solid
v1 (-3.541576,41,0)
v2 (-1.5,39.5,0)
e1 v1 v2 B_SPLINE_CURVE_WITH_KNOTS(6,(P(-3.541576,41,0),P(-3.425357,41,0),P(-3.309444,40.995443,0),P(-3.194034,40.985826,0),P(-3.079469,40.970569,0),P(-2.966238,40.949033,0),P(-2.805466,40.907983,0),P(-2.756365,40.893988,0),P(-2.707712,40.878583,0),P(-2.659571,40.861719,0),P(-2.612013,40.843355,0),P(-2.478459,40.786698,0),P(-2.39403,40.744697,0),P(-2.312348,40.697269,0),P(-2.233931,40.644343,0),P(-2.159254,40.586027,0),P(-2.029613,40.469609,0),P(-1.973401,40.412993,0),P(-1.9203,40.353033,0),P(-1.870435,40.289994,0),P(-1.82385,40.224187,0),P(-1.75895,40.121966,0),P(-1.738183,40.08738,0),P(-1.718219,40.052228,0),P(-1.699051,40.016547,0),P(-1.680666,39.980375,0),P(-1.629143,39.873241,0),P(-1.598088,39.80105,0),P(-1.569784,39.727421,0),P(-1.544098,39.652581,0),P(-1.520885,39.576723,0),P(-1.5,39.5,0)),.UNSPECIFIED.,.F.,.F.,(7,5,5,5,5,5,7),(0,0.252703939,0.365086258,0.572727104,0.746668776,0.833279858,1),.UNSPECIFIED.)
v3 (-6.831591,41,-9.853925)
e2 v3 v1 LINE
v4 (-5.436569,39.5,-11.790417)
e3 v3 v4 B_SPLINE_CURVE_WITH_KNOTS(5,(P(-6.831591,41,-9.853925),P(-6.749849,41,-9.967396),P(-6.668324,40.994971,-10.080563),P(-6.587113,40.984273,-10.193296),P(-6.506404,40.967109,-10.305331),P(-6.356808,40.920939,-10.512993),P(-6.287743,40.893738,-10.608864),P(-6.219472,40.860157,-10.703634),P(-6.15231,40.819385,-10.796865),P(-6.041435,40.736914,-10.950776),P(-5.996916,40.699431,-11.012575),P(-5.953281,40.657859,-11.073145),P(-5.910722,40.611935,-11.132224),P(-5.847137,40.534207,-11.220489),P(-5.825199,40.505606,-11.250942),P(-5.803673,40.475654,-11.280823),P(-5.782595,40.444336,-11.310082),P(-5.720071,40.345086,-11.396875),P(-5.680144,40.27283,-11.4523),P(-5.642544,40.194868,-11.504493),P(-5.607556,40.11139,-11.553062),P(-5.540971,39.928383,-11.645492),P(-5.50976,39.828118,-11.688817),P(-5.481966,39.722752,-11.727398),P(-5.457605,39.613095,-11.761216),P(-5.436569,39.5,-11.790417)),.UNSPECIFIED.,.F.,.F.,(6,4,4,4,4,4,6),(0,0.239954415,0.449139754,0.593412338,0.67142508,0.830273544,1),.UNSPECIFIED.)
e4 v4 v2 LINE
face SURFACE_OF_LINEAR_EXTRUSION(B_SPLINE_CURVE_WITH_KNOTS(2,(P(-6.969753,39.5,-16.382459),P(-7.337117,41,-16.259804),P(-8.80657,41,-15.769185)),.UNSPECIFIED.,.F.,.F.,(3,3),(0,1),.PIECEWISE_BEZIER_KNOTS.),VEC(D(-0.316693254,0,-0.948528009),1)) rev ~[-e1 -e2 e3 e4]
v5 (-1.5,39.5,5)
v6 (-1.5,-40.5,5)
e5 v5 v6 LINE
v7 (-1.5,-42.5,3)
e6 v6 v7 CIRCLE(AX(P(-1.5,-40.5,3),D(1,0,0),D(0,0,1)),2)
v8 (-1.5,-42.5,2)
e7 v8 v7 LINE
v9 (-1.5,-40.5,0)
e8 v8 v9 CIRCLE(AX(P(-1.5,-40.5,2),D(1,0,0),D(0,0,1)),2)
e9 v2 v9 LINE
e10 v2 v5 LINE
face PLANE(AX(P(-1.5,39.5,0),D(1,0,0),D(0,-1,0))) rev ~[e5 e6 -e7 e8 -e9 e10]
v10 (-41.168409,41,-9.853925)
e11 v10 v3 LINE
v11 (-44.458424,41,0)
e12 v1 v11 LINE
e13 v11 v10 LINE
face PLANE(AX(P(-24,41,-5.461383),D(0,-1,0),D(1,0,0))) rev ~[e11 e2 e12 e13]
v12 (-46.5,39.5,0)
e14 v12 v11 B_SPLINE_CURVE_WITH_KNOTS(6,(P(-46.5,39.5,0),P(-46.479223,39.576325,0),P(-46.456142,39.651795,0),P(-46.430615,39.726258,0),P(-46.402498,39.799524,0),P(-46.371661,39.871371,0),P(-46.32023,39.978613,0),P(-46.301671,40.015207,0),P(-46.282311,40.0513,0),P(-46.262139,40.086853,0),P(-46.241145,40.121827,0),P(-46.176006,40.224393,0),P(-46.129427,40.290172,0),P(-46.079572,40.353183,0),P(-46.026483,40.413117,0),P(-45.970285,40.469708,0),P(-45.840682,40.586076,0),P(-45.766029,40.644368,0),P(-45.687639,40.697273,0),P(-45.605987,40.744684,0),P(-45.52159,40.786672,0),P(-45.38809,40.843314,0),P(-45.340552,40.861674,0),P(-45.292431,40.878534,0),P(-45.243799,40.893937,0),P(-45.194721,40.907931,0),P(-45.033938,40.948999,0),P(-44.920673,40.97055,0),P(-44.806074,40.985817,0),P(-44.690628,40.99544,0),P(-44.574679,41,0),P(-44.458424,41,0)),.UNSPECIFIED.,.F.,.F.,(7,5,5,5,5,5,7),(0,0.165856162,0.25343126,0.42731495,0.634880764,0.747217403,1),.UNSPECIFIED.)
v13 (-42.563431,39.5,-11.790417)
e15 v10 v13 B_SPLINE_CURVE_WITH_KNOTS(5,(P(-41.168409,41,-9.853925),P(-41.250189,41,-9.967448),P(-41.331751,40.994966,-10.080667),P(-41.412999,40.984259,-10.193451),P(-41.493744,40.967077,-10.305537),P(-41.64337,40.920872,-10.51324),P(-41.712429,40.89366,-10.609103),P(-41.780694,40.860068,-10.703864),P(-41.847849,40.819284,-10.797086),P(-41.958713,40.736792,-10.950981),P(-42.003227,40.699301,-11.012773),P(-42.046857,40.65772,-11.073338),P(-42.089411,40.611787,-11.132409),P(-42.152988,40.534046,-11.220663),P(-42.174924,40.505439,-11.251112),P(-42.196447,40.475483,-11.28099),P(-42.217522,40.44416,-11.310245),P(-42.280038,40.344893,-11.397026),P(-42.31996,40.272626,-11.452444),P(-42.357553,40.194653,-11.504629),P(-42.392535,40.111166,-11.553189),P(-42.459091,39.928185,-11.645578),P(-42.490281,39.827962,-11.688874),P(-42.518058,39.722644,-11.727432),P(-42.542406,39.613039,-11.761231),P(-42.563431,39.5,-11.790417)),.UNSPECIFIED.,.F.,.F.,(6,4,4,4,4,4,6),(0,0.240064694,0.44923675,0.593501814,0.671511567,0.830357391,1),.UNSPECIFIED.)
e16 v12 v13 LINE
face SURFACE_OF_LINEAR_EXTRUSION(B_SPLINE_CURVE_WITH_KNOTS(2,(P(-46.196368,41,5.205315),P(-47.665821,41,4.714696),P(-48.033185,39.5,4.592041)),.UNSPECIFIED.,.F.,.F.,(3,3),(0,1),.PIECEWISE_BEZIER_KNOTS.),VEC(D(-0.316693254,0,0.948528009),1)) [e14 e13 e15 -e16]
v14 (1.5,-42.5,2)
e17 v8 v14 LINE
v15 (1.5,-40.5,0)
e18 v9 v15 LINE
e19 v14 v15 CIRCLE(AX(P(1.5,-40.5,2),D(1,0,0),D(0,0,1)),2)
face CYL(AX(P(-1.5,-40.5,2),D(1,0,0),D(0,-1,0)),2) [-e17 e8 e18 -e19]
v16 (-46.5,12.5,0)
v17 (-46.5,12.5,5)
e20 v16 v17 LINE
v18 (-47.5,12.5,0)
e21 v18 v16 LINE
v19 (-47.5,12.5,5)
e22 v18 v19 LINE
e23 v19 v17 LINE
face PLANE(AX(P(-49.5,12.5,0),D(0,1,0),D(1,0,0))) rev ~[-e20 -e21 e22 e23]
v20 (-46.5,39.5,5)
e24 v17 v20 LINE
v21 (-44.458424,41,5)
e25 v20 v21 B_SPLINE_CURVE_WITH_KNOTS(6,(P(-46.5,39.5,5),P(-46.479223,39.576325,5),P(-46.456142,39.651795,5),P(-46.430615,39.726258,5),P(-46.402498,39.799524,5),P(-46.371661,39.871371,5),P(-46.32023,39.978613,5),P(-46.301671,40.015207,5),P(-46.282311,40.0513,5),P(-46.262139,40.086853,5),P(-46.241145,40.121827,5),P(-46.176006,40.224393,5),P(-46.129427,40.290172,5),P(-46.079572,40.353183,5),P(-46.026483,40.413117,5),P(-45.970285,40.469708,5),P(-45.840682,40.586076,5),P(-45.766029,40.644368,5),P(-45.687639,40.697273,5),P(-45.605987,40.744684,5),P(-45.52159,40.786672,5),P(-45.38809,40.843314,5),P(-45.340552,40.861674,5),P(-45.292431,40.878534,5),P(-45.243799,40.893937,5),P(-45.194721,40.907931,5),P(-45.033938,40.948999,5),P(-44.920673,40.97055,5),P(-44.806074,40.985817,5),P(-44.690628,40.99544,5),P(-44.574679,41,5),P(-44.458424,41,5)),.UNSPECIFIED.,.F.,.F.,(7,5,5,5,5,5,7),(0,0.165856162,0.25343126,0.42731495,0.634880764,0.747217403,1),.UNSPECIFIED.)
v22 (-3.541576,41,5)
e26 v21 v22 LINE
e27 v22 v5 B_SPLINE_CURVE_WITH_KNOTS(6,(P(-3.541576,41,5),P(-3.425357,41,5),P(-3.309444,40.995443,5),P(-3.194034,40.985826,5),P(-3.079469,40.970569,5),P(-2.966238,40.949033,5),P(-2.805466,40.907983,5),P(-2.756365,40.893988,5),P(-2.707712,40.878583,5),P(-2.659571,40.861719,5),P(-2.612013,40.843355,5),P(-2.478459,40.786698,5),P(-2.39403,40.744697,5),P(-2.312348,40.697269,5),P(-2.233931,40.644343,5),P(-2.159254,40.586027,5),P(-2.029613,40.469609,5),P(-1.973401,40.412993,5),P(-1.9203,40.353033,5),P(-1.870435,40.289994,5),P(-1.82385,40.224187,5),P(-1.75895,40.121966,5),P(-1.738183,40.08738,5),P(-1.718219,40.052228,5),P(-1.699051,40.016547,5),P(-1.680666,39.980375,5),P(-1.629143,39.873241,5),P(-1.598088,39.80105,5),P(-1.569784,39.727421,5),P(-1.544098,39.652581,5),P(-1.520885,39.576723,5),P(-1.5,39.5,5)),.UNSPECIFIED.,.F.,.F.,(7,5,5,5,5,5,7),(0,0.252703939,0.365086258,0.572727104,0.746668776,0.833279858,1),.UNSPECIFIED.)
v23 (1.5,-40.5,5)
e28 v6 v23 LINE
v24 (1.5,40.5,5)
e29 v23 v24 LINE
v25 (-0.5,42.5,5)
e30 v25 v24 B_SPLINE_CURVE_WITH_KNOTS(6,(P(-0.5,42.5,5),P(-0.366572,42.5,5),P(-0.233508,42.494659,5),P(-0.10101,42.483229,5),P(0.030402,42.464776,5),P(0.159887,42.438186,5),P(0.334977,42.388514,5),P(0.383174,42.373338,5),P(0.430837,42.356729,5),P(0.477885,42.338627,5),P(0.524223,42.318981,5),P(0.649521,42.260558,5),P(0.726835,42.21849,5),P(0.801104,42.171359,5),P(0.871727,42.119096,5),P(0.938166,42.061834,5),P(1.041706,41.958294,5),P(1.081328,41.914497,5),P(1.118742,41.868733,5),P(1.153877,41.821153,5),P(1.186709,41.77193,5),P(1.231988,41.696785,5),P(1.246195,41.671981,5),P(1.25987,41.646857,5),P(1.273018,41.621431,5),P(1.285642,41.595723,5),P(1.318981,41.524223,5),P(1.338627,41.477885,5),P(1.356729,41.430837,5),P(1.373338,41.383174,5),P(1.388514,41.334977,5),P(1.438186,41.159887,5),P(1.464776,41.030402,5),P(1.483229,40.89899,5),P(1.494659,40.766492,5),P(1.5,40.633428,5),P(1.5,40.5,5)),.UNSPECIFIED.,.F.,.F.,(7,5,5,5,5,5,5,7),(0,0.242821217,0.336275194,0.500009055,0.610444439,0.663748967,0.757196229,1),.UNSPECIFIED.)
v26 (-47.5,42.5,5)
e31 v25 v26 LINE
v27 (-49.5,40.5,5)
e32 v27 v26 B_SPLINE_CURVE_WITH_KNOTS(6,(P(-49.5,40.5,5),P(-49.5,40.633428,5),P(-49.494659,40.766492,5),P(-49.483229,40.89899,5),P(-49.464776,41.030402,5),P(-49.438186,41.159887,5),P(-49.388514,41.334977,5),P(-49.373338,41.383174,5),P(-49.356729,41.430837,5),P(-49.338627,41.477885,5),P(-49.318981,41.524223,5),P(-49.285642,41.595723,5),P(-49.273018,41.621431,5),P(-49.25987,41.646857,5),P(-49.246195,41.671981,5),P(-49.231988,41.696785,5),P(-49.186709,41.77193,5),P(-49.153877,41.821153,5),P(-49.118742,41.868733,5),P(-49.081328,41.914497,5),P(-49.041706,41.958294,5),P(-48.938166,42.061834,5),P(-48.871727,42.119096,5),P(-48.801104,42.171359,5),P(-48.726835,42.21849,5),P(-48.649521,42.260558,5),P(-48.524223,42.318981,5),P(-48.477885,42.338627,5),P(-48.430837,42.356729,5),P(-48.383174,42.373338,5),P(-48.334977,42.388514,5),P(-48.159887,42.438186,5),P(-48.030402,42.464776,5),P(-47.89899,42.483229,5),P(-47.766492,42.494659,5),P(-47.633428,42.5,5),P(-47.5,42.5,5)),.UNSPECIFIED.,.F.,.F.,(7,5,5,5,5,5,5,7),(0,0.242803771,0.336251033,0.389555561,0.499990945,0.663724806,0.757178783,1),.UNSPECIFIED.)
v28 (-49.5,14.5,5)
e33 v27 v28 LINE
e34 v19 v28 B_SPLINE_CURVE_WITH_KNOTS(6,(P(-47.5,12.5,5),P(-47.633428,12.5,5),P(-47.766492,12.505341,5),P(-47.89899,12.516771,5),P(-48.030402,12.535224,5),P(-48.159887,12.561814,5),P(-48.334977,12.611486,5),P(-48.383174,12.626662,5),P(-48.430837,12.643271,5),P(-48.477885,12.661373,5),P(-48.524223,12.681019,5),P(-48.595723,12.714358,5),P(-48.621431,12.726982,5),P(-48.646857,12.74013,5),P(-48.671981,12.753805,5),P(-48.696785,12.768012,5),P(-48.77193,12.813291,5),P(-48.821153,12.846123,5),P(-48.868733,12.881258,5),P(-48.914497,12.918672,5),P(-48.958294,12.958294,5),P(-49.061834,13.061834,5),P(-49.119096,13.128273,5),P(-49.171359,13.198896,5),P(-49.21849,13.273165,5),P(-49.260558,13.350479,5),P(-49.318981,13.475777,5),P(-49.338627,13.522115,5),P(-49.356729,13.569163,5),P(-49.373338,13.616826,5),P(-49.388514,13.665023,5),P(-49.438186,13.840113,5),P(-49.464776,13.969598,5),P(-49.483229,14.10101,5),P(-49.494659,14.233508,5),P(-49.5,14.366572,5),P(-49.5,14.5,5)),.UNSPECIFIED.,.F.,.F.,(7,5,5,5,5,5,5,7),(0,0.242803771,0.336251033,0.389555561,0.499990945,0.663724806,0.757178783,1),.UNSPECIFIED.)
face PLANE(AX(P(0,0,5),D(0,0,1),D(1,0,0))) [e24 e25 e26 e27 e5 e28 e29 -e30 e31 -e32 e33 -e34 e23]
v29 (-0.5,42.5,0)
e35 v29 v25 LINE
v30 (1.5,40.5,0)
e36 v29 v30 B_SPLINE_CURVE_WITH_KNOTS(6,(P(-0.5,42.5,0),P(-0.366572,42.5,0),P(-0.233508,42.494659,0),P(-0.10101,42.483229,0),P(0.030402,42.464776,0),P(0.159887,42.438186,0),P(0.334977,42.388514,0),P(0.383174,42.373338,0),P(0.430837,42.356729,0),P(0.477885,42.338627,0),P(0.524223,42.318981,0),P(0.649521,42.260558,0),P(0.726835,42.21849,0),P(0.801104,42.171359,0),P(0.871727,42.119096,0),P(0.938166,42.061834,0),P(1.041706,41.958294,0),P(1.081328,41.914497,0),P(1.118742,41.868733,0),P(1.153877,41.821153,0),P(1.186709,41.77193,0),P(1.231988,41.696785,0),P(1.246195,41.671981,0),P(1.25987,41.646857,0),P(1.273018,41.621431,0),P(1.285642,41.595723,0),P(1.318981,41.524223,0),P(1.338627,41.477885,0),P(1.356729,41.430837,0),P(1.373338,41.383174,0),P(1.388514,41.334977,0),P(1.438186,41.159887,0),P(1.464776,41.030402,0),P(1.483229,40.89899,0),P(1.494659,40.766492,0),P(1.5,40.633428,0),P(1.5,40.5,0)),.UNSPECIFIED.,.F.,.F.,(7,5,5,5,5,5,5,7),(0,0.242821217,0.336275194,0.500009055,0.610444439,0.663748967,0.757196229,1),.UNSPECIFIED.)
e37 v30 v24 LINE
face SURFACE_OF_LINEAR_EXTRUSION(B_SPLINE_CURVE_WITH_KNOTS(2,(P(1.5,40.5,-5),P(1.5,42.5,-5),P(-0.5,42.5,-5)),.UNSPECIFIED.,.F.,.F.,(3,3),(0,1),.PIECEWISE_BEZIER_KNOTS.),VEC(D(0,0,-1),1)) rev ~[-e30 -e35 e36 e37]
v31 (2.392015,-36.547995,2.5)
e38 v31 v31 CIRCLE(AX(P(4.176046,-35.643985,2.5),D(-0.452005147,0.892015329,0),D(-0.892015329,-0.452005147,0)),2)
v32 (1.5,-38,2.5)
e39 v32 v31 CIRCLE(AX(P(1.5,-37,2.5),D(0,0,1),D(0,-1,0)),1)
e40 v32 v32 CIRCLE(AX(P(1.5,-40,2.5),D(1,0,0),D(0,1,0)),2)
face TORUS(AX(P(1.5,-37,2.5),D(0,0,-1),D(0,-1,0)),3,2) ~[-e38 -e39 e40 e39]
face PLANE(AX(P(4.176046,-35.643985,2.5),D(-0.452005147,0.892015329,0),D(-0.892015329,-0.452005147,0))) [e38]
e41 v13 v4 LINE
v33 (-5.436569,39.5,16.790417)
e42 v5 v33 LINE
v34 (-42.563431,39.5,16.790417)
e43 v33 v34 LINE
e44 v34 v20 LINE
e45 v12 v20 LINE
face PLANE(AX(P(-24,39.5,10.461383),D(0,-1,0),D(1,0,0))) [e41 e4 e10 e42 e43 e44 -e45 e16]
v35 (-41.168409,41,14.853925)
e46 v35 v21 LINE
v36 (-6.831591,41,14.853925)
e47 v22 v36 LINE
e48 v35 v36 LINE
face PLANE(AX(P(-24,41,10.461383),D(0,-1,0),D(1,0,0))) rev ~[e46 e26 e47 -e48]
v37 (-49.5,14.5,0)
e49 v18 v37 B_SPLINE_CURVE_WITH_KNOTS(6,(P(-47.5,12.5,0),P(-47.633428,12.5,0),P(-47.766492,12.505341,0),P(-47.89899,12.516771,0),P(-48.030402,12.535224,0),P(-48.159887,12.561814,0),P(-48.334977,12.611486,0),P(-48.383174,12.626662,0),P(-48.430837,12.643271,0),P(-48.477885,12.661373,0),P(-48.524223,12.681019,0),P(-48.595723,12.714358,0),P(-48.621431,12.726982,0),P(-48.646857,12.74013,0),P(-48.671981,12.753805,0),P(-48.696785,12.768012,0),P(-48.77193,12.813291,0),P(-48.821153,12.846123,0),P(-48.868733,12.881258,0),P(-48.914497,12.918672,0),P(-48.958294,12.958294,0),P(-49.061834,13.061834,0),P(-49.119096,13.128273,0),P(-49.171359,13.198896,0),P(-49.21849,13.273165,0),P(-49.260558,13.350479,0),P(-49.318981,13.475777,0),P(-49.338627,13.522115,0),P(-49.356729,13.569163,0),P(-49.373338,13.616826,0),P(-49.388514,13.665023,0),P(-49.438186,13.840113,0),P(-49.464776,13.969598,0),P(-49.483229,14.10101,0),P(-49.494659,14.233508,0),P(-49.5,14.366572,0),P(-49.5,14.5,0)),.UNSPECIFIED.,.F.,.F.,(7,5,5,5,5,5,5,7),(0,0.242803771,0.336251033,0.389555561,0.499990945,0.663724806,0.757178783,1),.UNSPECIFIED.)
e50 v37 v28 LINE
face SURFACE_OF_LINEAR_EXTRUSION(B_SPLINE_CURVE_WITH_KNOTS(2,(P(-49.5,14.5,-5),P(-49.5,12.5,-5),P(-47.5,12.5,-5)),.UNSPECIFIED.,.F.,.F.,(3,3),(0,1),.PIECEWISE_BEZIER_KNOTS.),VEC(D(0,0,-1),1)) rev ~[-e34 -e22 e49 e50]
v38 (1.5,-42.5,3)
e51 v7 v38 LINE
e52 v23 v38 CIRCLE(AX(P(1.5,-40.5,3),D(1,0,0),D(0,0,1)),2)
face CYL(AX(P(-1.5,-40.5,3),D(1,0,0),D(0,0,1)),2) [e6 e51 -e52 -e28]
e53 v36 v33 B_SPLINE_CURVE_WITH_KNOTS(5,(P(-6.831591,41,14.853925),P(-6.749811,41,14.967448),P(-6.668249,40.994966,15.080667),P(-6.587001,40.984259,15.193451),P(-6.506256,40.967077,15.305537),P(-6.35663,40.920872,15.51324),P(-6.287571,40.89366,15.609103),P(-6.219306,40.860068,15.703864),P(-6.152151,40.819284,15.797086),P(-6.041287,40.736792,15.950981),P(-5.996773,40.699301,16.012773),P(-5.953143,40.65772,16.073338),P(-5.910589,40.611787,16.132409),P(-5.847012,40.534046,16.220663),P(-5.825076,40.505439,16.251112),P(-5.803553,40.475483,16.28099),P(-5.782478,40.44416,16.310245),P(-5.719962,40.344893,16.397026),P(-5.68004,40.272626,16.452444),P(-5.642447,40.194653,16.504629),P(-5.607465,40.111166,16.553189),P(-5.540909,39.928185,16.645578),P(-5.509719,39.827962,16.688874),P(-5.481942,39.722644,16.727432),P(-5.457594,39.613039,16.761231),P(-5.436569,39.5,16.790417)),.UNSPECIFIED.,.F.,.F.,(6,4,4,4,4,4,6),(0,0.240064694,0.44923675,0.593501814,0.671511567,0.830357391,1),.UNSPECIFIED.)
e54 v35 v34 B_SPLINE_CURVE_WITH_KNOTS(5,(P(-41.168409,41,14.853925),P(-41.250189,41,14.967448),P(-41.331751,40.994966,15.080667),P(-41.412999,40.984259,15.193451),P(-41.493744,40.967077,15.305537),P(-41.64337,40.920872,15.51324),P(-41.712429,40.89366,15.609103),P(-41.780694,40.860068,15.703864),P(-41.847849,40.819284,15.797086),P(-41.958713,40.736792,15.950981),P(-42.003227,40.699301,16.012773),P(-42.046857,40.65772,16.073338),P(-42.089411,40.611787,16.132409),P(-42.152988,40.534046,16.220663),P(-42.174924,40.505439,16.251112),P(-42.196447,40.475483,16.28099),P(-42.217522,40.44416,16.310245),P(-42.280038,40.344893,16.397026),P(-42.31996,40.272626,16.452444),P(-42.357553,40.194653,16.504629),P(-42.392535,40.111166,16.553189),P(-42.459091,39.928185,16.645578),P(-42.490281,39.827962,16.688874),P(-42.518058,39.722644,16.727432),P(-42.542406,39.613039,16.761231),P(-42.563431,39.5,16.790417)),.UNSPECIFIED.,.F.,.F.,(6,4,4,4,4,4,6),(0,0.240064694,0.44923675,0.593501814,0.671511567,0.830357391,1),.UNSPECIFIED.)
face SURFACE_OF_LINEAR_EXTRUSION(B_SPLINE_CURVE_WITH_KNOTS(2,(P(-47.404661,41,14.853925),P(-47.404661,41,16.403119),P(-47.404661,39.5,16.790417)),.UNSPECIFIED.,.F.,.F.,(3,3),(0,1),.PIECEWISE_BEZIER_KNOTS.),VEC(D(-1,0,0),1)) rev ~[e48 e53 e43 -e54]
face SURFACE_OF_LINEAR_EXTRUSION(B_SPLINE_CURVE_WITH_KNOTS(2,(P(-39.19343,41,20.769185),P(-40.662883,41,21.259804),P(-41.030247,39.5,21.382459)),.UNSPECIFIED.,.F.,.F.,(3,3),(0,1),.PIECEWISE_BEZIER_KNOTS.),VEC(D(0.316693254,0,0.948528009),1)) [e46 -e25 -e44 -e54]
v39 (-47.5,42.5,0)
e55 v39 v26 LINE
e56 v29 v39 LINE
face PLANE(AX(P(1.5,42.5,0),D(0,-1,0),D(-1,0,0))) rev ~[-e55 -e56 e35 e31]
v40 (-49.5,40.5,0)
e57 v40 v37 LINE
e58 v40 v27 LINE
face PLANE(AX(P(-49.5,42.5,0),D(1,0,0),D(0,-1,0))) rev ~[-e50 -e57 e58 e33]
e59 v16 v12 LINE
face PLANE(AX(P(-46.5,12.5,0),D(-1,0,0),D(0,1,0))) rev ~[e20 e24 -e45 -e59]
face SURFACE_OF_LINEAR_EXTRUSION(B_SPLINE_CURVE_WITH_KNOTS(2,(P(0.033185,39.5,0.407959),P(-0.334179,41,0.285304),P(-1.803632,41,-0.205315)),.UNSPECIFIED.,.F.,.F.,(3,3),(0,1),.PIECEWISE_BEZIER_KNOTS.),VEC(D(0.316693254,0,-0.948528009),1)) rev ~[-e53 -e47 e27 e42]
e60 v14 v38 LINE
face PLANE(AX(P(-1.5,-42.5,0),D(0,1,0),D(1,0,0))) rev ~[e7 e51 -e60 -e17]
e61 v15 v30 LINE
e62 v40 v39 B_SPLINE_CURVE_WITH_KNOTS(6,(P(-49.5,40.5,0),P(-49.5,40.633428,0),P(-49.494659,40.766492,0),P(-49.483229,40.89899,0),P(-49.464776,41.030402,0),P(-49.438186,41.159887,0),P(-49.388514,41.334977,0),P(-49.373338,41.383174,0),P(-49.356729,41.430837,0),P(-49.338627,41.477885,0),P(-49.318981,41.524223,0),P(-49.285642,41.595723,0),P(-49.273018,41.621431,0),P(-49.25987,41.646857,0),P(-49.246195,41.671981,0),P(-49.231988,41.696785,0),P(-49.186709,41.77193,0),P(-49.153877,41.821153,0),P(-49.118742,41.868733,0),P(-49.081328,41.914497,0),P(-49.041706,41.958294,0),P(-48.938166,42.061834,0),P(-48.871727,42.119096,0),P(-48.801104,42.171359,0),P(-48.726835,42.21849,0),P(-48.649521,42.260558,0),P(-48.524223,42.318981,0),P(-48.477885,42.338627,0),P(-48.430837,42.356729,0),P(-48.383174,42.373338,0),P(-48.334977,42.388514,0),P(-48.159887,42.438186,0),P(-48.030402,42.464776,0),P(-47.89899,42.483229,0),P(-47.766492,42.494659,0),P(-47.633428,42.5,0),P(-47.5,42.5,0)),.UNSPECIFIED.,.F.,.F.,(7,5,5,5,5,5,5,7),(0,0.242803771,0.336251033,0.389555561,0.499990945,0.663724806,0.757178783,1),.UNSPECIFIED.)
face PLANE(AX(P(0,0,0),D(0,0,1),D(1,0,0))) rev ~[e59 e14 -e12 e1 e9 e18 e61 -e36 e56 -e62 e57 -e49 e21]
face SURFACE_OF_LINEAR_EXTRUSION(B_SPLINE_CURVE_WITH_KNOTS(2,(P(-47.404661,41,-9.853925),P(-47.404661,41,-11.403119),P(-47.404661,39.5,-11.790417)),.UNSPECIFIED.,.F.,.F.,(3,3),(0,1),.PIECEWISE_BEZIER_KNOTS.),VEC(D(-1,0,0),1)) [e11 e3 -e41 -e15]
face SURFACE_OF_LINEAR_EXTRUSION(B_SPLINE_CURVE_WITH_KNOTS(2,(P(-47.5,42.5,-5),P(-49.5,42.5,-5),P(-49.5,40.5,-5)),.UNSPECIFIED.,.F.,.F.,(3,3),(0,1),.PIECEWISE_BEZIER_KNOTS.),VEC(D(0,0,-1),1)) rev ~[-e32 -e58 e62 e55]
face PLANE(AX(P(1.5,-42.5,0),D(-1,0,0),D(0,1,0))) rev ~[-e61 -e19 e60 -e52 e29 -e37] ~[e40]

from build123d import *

# Parameters (mm, degrees)
F0_W         = 3
F0_H         = 27
F1_DEPTH     = 5
F3_DEPTH     = 1.5
F4_R         = 2
F5_ANGLE     = 116.8724050768
F6_R         = 2
F7_T1_DEPTH  = 15
F7_T3_DEPTH  = 46.8093211895
F7_T8_DEPTH  = 22.1126839652
F7_T13_DEPTH = 22.1126839652
F7_T18_DEPTH = 22.1126839652
F7_T23_DEPTH = 22.1126839652
F7_T28_DEPTH = 22.1126839652
F7_T33_DEPTH = 22.1126839652
F7_T38_DEPTH = 22.1126839652
F7_T43_DEPTH = 22.1126839652


# Not quite as in the source:
# - a fillet or chamfer that OpenCascade refuses, or shapes differently, is made with other operations: its cross-section is extruded or revolved along the edge and cut away or added


with BuildPart() as f1:
    # F0 (on Top) → F1 (new body)
    with BuildSketch(Plane.XY):
        Polygon((1.5, -42.5), (1.5, 42.5), (-1.5, 42.5), (-1.5, 39.5), (-1.5, -42.5), align=None)
        Polygon((-1.5, 39.5), (-1.5, 42.5), (-49.5, 42.5), (-49.5, 39.5), (-46.5, 39.5), align=None)
        with Locations((-48, 26)):
            Rectangle(F0_W, F0_H)
    extrude(amount=F1_DEPTH)

    # F2 (on face) → F3 (join)
    with BuildSketch(Plane.XZ.offset(-39.5)):
        Polygon((-42.563431412, 16.7904171348), (-46.5, 5), (-1.5, 5), (-5.436568588, 16.7904171348), (-24, 16.7904171348), align=None)
        Polygon((-1.5, 0), (-46.5, 0), (-42.563431412, -11.7904171348), (-24, -11.7904171348), (-5.436568588, -11.7904171348), align=None)
    extrude(amount=-F3_DEPTH)

    # F4 (on face) → F5 (revolve)
    with BuildSketch(Plane.YZ.offset(1.5)):
        with Locations((-40, 2.5)):
            Circle(F4_R)
    revolve(axis=Axis((1.5, -37, 2.371235867), (0, 0, 1)), revolution_arc=F5_ANGLE)

    # F6
    f6_edges = [f1.edges().sort_by_distance(p)[0] for p in [
        (0, -42.5, 0),
        (0, -42.5, 5),
    ]]
    fillet(f6_edges, radius=F6_R)

    # F7: fillet of radius 2 on 9 edges, made by hand

    # F7_s2 → F7_t1 (cut)
    with BuildSketch(Plane.XY.offset(-5)):
        with BuildLine():
            add(Edge.make_bspline(
                [(1.5, 40.5), (1.5, 42.5), (-0.5, 42.5)],
                knots=[0, 0, 0, 1, 1, 1], degree=2, weights=[1, 1, 1]))
            Line((-0.5, 42.5), (1.5, 42.5))
            Line((1.5, 42.5), (1.5, 40.5))
        make_face()
        with BuildLine():
            add(Edge.make_bspline(
                [(-47.5, 42.5), (-49.5, 42.5), (-49.5, 40.5)],
                knots=[0, 0, 0, 1, 1, 1], degree=2, weights=[1, 1, 1]))
            Line((-49.5, 40.5), (-49.5, 42.5))
            Line((-49.5, 42.5), (-47.5, 42.5))
        make_face()
        with BuildLine():
            add(Edge.make_bspline(
                [(-49.5, 14.5), (-49.5, 12.5), (-47.5, 12.5)],
                knots=[0, 0, 0, 1, 1, 1], degree=2, weights=[1, 1, 1]))
            Line((-47.5, 12.5), (-49.5, 12.5))
            Line((-49.5, 12.5), (-49.5, 14.5))
        make_face()
    extrude(amount=F7_T1_DEPTH, mode=Mode.SUBTRACT)

    # F7_s4 → F7_t3 (cut)
    with BuildSketch(Plane.YZ.offset(-47.4046605947)):
        with BuildLine():
            add(Edge.make_bspline(
                [(41, 14.8539254617), (41, 16.4031188001), (39.5, 16.7904171348)],
                knots=[0, 0, 0, 1, 1, 1], degree=2, weights=[1, 1, 1]))
            Line((39.5, 16.7904171348), (41, 16.7904171348))
            Line((41, 16.7904171348), (41, 14.8539254617))
        make_face()
        with BuildLine():
            add(Edge.make_bspline(
                [(41, -9.8539254617), (41, -11.4031188001), (39.5, -11.7904171348)],
                knots=[0, 0, 0, 1, 1, 1], degree=2, weights=[1, 1, 1]))
            Line((39.5, -11.7904171348), (41, -11.7904171348))
            Line((41, -11.7904171348), (41, -9.8539254617))
        make_face()
    extrude(amount=F7_T3_DEPTH, mode=Mode.SUBTRACT)


with BuildPart() as f7_tool6:
    # F7_s7 → F7_t8 (new body)
    with BuildSketch(Plane(origin=(2.3080156307, 0, 6.912737942), x_dir=(0, 1, 0), z_dir=(-0.3166932536, 0, -0.9485280086))):
        with BuildLine():
            add(Edge.make_bspline(
                [(41, -43.7535269955), (41, -45.302720334), (39.5, -45.6900186686)],
                knots=[0, 0, 0, 1, 1, 1], degree=2, weights=[1, 1, 1]))
            Line((39.5, -45.6900186686), (41, -45.6900186686))
            Line((41, -45.6900186686), (41, -43.7535269955))
        make_face()
    extrude(amount=F7_T8_DEPTH)

    split(bisect_by=Plane.XY.offset(5), keep=Keep.TOP)


with BuildPart() as f1_1:
    add(f1.part)

    # F7_t5: cut F7_tool6
    add(f7_tool6.part, mode=Mode.SUBTRACT)


with BuildPart() as f7_tool11:
    # F7_s12 → F7_t13 (new body)
    with BuildSketch(Plane(origin=(2.3080156307, 0, 6.912737942), x_dir=(0, 1, 0), z_dir=(-0.3166932536, 0, -0.9485280086))):
        with BuildLine():
            add(Edge.make_bspline(
                [(41, -43.7535269955), (41, -45.302720334), (39.5, -45.6900186686)],
                knots=[0, 0, 0, 1, 1, 1], degree=2, weights=[1, 1, 1]))
            Line((39.5, -45.6900186686), (41, -45.6900186686))
            Line((41, -45.6900186686), (41, -43.7535269955))
        make_face()
    extrude(amount=F7_T13_DEPTH)

    split(bisect_by=Plane.XY, keep=Keep.BOTTOM)


with BuildPart() as f1_2:
    add(f1_1.part)

    # F7_t10: cut F7_tool11
    add(f7_tool11.part, mode=Mode.SUBTRACT)


with BuildPart() as f7_tool16:
    # F7_s17 → F7_t18 (new body)
    with BuildSketch(Plane(origin=(-0.1192194099, 0, 0.3570740714), x_dir=(0, 1, 0), z_dir=(-0.3166932536, 0, 0.9485280086))):
        with BuildLine():
            add(Edge.make_bspline(
                [(39.5, -0.160674255), (41, 0.2266240796), (41, 1.7758174181)],
                knots=[0, 0, 0, 1, 1, 1], degree=2, weights=[1, 1, 1]))
            Line((41, 1.7758174181), (41, -0.160674255))
            Line((41, -0.160674255), (39.5, -0.160674255))
        make_face()
    extrude(amount=F7_T18_DEPTH)

    split(bisect_by=Plane.XY, keep=Keep.BOTTOM)


with BuildPart() as f1_3:
    add(f1_2.part)

    # F7_t15: cut F7_tool16
    add(f7_tool16.part, mode=Mode.SUBTRACT)


with BuildPart() as f7_tool21:
    # F7_s22 → F7_t23 (new body)
    with BuildSketch(Plane(origin=(-0.1192194099, 0, 0.3570740714), x_dir=(0, 1, 0), z_dir=(-0.3166932536, 0, 0.9485280086))):
        with BuildLine():
            add(Edge.make_bspline(
                [(39.5, -0.160674255), (41, 0.2266240796), (41, 1.7758174181)],
                knots=[0, 0, 0, 1, 1, 1], degree=2, weights=[1, 1, 1]))
            Line((41, 1.7758174181), (41, -0.160674255))
            Line((41, -0.160674255), (39.5, -0.160674255))
        make_face()
    extrude(amount=F7_T23_DEPTH)

    split(bisect_by=Plane.XY.offset(5), keep=Keep.TOP)


with BuildPart() as f1_4:
    add(f1_3.part)

    # F7_t20: cut F7_tool21
    add(f7_tool21.part, mode=Mode.SUBTRACT)


with BuildPart() as f7_tool26:
    # F7_s27 → F7_t28 (new body)
    with BuildSketch(Plane(origin=(-6.1968843057, 0, 18.5602890603), x_dir=(0, 1, 0), z_dir=(0.3166932536, 0, -0.9485280086))):
        with BuildLine():
            add(Edge.make_bspline(
                [(41, -42.1700607276), (41, -43.7192540661), (39.5, -44.1065524007)],
                knots=[0, 0, 0, 1, 1, 1], degree=2, weights=[1, 1, 1]))
            Line((39.5, -44.1065524007), (41, -44.1065524007))
            Line((41, -44.1065524007), (41, -42.1700607276))
        make_face()
    extrude(amount=F7_T28_DEPTH)

    split(bisect_by=Plane.XY.offset(5), keep=Keep.TOP)


with BuildPart() as f1_5:
    add(f1_4.part)

    # F7_t25: cut F7_tool26
    add(f7_tool26.part, mode=Mode.SUBTRACT)


with BuildPart() as f7_tool31:
    # F7_s32 → F7_t33 (new body)
    with BuildSketch(Plane(origin=(-6.1968843057, 0, 18.5602890603), x_dir=(0, 1, 0), z_dir=(0.3166932536, 0, -0.9485280086))):
        with BuildLine():
            add(Edge.make_bspline(
                [(41, -42.1700607276), (41, -43.7192540661), (39.5, -44.1065524007)],
                knots=[0, 0, 0, 1, 1, 1], degree=2, weights=[1, 1, 1]))
            Line((39.5, -44.1065524007), (41, -44.1065524007))
            Line((41, -44.1065524007), (41, -42.1700607276))
        make_face()
    extrude(amount=F7_T33_DEPTH)

    split(bisect_by=Plane.XY, keep=Keep.BOTTOM)


with BuildPart() as f1_6:
    add(f1_5.part)

    # F7_t30: cut F7_tool31
    add(f7_tool31.part, mode=Mode.SUBTRACT)


with BuildPart() as f7_tool36:
    # F7_s37 → F7_t38 (new body)
    with BuildSketch(Plane(origin=(-5.6201951346, 0, -16.8330472425), x_dir=(0, 1, 0), z_dir=(0.3166932536, 0, 0.9485280086))):
        with BuildLine():
            add(Edge.make_bspline(
                [(39.5, 1.4227920129), (41, 1.8100903475), (41, 3.359283686)],
                knots=[0, 0, 0, 1, 1, 1], degree=2, weights=[1, 1, 1]))
            Line((41, 3.359283686), (41, 1.4227920129))
            Line((41, 1.4227920129), (39.5, 1.4227920129))
        make_face()
    extrude(amount=F7_T38_DEPTH)

    split(bisect_by=Plane.XY, keep=Keep.BOTTOM)


with BuildPart() as f1_7:
    add(f1_6.part)

    # F7_t35: cut F7_tool36
    add(f7_tool36.part, mode=Mode.SUBTRACT)


with BuildPart() as f7_tool41:
    # F7_s42 → F7_t43 (new body)
    with BuildSketch(Plane(origin=(-5.6201951346, 0, -16.8330472425), x_dir=(0, 1, 0), z_dir=(0.3166932536, 0, 0.9485280086))):
        with BuildLine():
            add(Edge.make_bspline(
                [(39.5, 1.4227920129), (41, 1.8100903475), (41, 3.359283686)],
                knots=[0, 0, 0, 1, 1, 1], degree=2, weights=[1, 1, 1]))
            Line((41, 3.359283686), (41, 1.4227920129))
            Line((41, 1.4227920129), (39.5, 1.4227920129))
        make_face()
    extrude(amount=F7_T43_DEPTH)

    split(bisect_by=Plane.XY.offset(5), keep=Keep.TOP)


with BuildPart() as f1_8:
    add(f1_7.part)

    # F7_t40: cut F7_tool41
    add(f7_tool41.part, mode=Mode.SUBTRACT)


solid = f1_8.part
